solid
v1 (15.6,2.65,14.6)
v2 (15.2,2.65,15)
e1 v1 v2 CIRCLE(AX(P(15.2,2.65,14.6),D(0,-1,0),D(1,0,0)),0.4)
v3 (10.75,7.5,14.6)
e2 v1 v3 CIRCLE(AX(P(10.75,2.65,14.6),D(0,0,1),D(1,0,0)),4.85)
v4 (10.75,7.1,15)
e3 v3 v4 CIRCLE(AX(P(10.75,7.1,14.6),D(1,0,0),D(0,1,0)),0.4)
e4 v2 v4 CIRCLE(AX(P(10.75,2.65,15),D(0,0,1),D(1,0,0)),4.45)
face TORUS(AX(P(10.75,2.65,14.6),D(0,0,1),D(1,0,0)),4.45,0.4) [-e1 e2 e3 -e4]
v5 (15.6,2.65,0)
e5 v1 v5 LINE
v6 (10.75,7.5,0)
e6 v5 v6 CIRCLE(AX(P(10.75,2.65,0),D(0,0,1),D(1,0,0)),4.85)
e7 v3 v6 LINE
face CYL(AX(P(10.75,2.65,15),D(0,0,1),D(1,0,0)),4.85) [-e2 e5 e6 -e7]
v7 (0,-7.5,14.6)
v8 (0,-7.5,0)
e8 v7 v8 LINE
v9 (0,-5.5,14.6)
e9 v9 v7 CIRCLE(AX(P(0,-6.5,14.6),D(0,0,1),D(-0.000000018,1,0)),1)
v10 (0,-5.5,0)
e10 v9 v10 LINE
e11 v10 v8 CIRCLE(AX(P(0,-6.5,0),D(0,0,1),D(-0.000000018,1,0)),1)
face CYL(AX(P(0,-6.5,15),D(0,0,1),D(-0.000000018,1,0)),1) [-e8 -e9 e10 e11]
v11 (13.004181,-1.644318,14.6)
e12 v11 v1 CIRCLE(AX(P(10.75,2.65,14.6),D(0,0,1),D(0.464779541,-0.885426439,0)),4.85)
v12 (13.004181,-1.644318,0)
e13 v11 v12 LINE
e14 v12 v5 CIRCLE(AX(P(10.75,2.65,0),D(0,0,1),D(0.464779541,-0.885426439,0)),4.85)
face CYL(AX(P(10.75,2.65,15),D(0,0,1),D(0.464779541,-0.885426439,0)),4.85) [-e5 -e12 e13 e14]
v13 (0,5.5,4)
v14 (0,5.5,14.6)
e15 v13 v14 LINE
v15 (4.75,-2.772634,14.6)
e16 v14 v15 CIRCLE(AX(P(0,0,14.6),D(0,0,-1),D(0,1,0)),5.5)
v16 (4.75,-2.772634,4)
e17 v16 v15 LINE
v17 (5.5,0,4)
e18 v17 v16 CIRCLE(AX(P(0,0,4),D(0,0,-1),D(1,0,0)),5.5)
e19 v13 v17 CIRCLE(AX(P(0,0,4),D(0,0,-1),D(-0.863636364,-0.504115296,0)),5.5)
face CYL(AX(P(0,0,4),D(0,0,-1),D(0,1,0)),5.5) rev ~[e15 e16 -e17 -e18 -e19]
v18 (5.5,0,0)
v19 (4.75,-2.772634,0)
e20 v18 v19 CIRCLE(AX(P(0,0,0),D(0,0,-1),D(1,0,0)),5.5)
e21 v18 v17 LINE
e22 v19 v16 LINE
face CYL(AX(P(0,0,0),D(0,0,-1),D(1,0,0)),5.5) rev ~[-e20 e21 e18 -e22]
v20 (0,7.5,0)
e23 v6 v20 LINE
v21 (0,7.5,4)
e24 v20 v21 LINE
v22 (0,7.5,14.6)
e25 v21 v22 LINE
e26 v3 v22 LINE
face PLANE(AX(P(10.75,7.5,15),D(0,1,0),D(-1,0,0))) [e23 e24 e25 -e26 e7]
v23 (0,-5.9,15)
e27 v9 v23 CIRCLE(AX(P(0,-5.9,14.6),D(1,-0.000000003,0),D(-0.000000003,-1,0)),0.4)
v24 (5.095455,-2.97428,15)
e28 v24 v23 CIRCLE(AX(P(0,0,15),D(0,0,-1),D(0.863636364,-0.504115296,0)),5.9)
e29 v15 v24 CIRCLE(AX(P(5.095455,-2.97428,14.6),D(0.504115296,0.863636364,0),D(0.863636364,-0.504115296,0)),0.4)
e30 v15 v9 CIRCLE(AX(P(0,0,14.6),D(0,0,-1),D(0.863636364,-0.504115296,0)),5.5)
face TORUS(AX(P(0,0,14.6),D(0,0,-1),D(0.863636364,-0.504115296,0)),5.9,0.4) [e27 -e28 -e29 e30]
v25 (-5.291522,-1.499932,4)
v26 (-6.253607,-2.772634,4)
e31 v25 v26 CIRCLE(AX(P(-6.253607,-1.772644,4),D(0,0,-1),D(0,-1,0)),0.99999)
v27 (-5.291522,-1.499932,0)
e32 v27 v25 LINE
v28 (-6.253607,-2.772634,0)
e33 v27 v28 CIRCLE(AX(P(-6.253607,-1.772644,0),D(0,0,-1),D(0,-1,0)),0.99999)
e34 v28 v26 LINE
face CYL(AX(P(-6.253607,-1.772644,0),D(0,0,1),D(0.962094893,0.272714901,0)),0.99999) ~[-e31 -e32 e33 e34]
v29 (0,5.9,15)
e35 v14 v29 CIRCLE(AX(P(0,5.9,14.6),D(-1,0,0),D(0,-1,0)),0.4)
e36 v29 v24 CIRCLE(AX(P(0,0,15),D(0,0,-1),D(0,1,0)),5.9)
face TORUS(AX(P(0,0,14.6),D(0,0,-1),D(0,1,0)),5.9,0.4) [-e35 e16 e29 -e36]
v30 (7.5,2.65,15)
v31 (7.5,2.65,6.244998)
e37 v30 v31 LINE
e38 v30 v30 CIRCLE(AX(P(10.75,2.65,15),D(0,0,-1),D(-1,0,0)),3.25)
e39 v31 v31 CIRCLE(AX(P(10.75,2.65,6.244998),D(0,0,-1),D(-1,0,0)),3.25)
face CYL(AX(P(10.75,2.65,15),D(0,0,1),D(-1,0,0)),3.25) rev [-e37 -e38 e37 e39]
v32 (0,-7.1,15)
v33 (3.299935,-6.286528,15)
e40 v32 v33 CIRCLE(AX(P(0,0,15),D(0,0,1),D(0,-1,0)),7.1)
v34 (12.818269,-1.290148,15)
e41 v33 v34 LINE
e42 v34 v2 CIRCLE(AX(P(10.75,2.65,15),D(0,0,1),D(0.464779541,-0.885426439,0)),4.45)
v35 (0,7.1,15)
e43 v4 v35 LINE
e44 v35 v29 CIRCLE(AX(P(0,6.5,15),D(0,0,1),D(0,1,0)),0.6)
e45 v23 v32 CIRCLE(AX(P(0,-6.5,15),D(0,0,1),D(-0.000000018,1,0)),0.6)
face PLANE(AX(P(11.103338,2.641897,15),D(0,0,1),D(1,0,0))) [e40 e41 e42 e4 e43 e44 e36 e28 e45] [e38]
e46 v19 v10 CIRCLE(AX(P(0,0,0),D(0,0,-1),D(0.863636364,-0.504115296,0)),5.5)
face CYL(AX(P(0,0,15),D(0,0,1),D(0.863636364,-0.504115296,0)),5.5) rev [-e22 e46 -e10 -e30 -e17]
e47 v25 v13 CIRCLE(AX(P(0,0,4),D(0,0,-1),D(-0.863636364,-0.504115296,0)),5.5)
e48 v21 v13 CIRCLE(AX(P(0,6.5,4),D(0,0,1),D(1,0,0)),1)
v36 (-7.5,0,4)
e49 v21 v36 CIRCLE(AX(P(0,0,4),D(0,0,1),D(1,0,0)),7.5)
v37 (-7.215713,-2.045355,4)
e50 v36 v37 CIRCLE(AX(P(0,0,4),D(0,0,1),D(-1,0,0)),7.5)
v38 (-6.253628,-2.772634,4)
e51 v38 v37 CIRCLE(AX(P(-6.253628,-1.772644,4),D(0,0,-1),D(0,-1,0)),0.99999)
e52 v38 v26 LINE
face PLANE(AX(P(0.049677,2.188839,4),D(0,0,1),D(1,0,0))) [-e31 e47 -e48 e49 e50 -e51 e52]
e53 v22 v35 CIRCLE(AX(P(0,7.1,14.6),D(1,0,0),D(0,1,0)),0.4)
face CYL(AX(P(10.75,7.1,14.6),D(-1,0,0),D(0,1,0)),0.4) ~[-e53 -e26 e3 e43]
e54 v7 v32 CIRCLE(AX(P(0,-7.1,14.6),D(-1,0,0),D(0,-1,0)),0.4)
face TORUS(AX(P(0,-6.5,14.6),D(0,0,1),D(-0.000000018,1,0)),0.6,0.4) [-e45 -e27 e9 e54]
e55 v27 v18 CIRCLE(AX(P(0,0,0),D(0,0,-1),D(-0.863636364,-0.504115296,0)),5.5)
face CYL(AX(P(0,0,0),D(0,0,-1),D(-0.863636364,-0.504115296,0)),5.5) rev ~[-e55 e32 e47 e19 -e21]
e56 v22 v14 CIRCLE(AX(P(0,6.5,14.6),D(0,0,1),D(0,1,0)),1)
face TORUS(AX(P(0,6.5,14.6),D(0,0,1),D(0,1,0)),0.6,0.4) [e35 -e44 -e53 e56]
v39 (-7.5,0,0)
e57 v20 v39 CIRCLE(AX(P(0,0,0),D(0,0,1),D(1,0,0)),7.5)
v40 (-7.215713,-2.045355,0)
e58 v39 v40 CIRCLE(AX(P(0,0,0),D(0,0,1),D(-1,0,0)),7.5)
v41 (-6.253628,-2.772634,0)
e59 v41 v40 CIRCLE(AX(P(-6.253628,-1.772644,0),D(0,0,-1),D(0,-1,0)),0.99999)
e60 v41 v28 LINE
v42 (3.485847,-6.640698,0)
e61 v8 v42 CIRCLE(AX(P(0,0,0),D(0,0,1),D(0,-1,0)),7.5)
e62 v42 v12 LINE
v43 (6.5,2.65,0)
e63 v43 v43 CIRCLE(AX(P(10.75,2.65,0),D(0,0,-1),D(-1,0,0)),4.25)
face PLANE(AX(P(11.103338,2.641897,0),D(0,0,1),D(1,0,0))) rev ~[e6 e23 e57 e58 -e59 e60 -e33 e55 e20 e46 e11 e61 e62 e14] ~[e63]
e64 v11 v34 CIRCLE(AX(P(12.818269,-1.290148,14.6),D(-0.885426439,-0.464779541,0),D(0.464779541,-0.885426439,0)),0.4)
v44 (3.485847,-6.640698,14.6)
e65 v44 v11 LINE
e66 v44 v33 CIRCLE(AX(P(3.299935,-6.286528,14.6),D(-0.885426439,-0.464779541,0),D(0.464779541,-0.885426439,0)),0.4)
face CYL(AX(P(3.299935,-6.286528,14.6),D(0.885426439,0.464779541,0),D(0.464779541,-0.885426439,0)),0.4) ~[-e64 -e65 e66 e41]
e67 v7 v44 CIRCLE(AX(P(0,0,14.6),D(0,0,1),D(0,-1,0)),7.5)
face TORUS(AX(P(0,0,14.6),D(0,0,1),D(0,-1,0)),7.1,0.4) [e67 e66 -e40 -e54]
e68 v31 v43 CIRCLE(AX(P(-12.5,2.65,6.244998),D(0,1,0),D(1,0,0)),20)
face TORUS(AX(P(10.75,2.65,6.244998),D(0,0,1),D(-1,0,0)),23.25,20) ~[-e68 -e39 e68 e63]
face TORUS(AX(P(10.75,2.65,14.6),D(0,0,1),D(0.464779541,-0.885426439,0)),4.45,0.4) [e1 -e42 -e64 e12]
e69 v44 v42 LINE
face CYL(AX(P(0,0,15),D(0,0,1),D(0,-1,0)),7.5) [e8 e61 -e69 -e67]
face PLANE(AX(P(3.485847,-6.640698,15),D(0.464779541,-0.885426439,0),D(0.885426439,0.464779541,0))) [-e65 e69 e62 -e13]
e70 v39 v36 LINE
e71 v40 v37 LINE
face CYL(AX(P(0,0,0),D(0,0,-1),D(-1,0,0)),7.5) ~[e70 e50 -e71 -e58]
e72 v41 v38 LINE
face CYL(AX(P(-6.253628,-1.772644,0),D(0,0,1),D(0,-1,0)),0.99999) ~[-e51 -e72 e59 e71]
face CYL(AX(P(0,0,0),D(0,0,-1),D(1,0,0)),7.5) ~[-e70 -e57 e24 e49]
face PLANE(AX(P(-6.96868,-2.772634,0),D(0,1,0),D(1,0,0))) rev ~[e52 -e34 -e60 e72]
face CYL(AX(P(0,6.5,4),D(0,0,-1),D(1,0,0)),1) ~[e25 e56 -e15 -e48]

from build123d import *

# Parameters (mm, degrees)
F1_DEPTH = 4
F2_R     = 1
F3_DEPTH = 11
F5_DEPTH = 15
F6_R     = 0.99999
F7_R     = 0.4


# Not quite as in the source:
# - a fillet or chamfer that OpenCascade refuses, or shapes differently, is made with other operations: its cross-section is extruded or revolved along the edge and cut away or added
# - a fillet or chamfer is up to 0.001 mm smaller than in the source, because OpenCascade refuses the exact size
# - a feature names something its author has since deleted; it is built from what else it names


with BuildPart() as f1:
    # F0 (on Top) → F1 (new body)
    with BuildSketch(Plane.XY):
        with BuildLine():
            ThreePointArc((-4.75, -2.7726341266), (-1.4361406616, 5.3091901454), (5.5, 0))
            ThreePointArc((5.5, 0), (5.3091901454, -1.4361406616), (4.75, -2.7726341266))
            Line((4.75, -2.7726341266), (6.9686799324, -2.7726341266))
            ThreePointArc((6.9686799324, -2.7726341266), (7.3659724237, -1.4115418001), (7.5, 0))
            ThreePointArc((7.5, 0), (5.3033008589, 5.3033008589), (0, 7.5))
            ThreePointArc((0, 7.5), (-5.3033008589, 5.3033008589), (-7.5, 0))
            ThreePointArc((-7.5, 0), (-7.3659724237, -1.4115418001), (-6.9686799324, -2.7726341266))
            Line((-6.9686799324, -2.7726341266), (-4.75, -2.7726341266))
        make_face()
        with BuildLine():
            ThreePointArc((0, 7.5), (5.3033008589, 5.3033008589), (7.5, 0))
            Line((7.5, 0), (7.5, 7.5))
            Line((7.5, 7.5), (0, 7.5))
        make_face()
    extrude(amount=F1_DEPTH)

    # F2 (on face) → F3 (join)
    with BuildSketch(Plane.XY.offset(4)):
        with Locations((0, 6.5)):
            Circle(F2_R)
        with BuildLine():
            ThreePointArc((0, 7.5), (0.7071067812, 7.2071067812), (1, 6.5))
            ThreePointArc((1, 6.5), (0.7071067812, 5.7928932188), (0, 5.5))
            ThreePointArc((0, 5.5), (4.769669155, 2.7386595538), (4.75, -2.7726341266))
            Line((4.75, -2.7726341266), (6.9686799324, -2.7726341266))
            ThreePointArc((6.9686799324, -2.7726341266), (7.3659724237, -1.4115418001), (7.5, 0))
            Line((7.5, 0), (7.5, 7.5))
            Line((7.5, 7.5), (0, 7.5))
        make_face()
    extrude(amount=F3_DEPTH)

    # F4 (on face) → F5 (join, through all)
    with BuildSketch(Plane.XY.offset(15)):
        with BuildLine():
            Line((7.5, 6.25), (7.5, 2.65))
            Line((7.5, 2.65), (7.5, 0))
            ThreePointArc((7.5, 0), (7.4864300086, -0.4509608915), (7.4457691398, -0.9002899069))
            ThreePointArc((7.4457691398, -0.9002899069), (10.1065360675, -2.1571253539), (13.0041807725, -1.6443182282))
            ThreePointArc((13.0041807725, -1.6443182282), (14.900619035, 0.1410437177), (15.6, 2.65))
            ThreePointArc((15.6, 2.65), (14.1794678888, 6.0794678888), (10.75, 7.5))
            ThreePointArc((10.75, 7.5), (9.0089514654, 7.1767261901), (7.5, 6.25))
        make_face()
        with BuildLine():
            ThreePointArc((7.5, 2.65), (10.75, 5.9), (14, 2.65))
            ThreePointArc((14, 2.65), (10.75, -0.6), (7.5, 2.65))
        make_face(mode=Mode.SUBTRACT)
        with BuildLine():
            Line((7.5, 0), (7.5, 2.65))
            Line((7.5, 2.65), (7.5, 6.25))
            ThreePointArc((7.5, 6.25), (6.712321746, 5.3369414428), (6.1742445242, 4.2577816473))
            ThreePointArc((6.1742445242, 4.2577816473), (7.1608949836, 2.2297046967), (7.5, 0))
        make_face()
        with BuildLine():
            ThreePointArc((7.4457691398, -0.9002899069), (7.4864300086, -0.4509608915), (7.5, 0))
            ThreePointArc((7.5, 0), (7.1608949836, 2.2297046967), (6.1742445242, 4.2577816473))
            ThreePointArc((6.1742445242, 4.2577816473), (6.0409691333, 1.4891691352), (7.4457691398, -0.9002899069))
        make_face()
        with BuildLine():
            Line((7.5, 7.5), (7.5, 6.25))
            ThreePointArc((7.5, 6.25), (9.0089514654, 7.1767261901), (10.75, 7.5))
            Line((10.75, 7.5), (7.5, 7.5))
        make_face()
        with BuildLine():
            ThreePointArc((13.0041807725, -1.6443182282), (10.1065360675, -2.1571253539), (7.4457691398, -0.9002899069))
            ThreePointArc((7.4457691398, -0.9002899069), (7.2677715796, -1.8518899176), (6.9686799324, -2.7726341266))
            ThreePointArc((6.9686799324, -2.7726341266), (5.5735770486, -5.0184897015), (3.4858465555, -6.640698291))
            Line((3.4858465555, -6.640698291), (13.0041807725, -1.6443182282))
        make_face()
        with BuildLine():
            ThreePointArc((3.4858465555, -6.640698291), (5.5735770486, -5.0184897015), (6.9686799324, -2.7726341266))
            Line((6.9686799324, -2.7726341266), (4.75, -2.7726341266))
            ThreePointArc((4.75, -2.7726341266), (2.7386595462, -4.7696691594), (-1.76e-08, -5.5))
            ThreePointArc((-1.76e-08, -5.5), (0.707106775, -5.7928932126), (1, -6.5))
            ThreePointArc((1, -6.5), (0.7071067812, -7.2071067812), (0, -7.5))
            ThreePointArc((0, -7.5), (1.7950992755, -7.2820064949), (3.4858465555, -6.640698291))
        make_face()
        with BuildLine():
            ThreePointArc((-1.76e-08, -5.5), (-1, -6.5000000088), (0, -7.5))
            ThreePointArc((0, -7.5), (0.7071067812, -7.2071067812), (1, -6.5))
            ThreePointArc((1, -6.5), (0.707106775, -5.7928932126), (-1.76e-08, -5.5))
        make_face()
    extrude(amount=-F5_DEPTH)

    # F6 (radius 1 in the source; OpenCascade refuses exactly that, so slightly less here)
    f6_edges = [f1.edges().sort_by_distance(p)[0] for p in [
        (-6.96868, -2.772634, 2),
        (-4.75, -2.772634, 2),
    ]]
    fillet(f6_edges, radius=F6_R)

    # F7
    f7_edges = [f1.edges().sort_by_distance(p)[0] for p in [
        (8.245014, -4.142508, 15),
        (3.75, 7.5, 15),
        (4.769669, 2.73866, 15),
        (-1, 6.5, 15),
        (9.125, 7.5, 15),
        (15.459031, 3.810831, 15),
        (1.795099, -7.282006, 15),
        (-1, -6.5, 15),
        (2.73866, -4.769669, 15),
    ]]
    fillet(f7_edges, radius=F7_R)

    # F8: chamfer of 1 on 1 edges, made by hand

    # F8_s1 → F8_t2 (revolve, cut)
    with BuildSketch(Plane.XZ.offset(-2.65)):
        Polygon((6.5, 0), (7.5, 1), (7.5, 0), align=None)
    revolve(axis=Axis((10.75, 2.65, 0), (0, 0, -1)), mode=Mode.SUBTRACT)

    # F9: fillet of radius 20 on 1 edges, made by hand

    # F9_s1 → F9_t2 (revolve, cut)
    with BuildSketch(Plane.XZ.offset(-2.65)):
        with BuildLine():
            ThreePointArc((7.5, 6.2449979984), (7.2484176581, 3.0827203382), (6.5, 0))
            Line((6.5, 0), (7.5, 1))
            Line((7.5, 1), (7.5, 6.2449979984))
        make_face()
    revolve(axis=Axis((10.75, 2.65, 1), (0, 0, -1)), mode=Mode.SUBTRACT)


solid = f1.part
